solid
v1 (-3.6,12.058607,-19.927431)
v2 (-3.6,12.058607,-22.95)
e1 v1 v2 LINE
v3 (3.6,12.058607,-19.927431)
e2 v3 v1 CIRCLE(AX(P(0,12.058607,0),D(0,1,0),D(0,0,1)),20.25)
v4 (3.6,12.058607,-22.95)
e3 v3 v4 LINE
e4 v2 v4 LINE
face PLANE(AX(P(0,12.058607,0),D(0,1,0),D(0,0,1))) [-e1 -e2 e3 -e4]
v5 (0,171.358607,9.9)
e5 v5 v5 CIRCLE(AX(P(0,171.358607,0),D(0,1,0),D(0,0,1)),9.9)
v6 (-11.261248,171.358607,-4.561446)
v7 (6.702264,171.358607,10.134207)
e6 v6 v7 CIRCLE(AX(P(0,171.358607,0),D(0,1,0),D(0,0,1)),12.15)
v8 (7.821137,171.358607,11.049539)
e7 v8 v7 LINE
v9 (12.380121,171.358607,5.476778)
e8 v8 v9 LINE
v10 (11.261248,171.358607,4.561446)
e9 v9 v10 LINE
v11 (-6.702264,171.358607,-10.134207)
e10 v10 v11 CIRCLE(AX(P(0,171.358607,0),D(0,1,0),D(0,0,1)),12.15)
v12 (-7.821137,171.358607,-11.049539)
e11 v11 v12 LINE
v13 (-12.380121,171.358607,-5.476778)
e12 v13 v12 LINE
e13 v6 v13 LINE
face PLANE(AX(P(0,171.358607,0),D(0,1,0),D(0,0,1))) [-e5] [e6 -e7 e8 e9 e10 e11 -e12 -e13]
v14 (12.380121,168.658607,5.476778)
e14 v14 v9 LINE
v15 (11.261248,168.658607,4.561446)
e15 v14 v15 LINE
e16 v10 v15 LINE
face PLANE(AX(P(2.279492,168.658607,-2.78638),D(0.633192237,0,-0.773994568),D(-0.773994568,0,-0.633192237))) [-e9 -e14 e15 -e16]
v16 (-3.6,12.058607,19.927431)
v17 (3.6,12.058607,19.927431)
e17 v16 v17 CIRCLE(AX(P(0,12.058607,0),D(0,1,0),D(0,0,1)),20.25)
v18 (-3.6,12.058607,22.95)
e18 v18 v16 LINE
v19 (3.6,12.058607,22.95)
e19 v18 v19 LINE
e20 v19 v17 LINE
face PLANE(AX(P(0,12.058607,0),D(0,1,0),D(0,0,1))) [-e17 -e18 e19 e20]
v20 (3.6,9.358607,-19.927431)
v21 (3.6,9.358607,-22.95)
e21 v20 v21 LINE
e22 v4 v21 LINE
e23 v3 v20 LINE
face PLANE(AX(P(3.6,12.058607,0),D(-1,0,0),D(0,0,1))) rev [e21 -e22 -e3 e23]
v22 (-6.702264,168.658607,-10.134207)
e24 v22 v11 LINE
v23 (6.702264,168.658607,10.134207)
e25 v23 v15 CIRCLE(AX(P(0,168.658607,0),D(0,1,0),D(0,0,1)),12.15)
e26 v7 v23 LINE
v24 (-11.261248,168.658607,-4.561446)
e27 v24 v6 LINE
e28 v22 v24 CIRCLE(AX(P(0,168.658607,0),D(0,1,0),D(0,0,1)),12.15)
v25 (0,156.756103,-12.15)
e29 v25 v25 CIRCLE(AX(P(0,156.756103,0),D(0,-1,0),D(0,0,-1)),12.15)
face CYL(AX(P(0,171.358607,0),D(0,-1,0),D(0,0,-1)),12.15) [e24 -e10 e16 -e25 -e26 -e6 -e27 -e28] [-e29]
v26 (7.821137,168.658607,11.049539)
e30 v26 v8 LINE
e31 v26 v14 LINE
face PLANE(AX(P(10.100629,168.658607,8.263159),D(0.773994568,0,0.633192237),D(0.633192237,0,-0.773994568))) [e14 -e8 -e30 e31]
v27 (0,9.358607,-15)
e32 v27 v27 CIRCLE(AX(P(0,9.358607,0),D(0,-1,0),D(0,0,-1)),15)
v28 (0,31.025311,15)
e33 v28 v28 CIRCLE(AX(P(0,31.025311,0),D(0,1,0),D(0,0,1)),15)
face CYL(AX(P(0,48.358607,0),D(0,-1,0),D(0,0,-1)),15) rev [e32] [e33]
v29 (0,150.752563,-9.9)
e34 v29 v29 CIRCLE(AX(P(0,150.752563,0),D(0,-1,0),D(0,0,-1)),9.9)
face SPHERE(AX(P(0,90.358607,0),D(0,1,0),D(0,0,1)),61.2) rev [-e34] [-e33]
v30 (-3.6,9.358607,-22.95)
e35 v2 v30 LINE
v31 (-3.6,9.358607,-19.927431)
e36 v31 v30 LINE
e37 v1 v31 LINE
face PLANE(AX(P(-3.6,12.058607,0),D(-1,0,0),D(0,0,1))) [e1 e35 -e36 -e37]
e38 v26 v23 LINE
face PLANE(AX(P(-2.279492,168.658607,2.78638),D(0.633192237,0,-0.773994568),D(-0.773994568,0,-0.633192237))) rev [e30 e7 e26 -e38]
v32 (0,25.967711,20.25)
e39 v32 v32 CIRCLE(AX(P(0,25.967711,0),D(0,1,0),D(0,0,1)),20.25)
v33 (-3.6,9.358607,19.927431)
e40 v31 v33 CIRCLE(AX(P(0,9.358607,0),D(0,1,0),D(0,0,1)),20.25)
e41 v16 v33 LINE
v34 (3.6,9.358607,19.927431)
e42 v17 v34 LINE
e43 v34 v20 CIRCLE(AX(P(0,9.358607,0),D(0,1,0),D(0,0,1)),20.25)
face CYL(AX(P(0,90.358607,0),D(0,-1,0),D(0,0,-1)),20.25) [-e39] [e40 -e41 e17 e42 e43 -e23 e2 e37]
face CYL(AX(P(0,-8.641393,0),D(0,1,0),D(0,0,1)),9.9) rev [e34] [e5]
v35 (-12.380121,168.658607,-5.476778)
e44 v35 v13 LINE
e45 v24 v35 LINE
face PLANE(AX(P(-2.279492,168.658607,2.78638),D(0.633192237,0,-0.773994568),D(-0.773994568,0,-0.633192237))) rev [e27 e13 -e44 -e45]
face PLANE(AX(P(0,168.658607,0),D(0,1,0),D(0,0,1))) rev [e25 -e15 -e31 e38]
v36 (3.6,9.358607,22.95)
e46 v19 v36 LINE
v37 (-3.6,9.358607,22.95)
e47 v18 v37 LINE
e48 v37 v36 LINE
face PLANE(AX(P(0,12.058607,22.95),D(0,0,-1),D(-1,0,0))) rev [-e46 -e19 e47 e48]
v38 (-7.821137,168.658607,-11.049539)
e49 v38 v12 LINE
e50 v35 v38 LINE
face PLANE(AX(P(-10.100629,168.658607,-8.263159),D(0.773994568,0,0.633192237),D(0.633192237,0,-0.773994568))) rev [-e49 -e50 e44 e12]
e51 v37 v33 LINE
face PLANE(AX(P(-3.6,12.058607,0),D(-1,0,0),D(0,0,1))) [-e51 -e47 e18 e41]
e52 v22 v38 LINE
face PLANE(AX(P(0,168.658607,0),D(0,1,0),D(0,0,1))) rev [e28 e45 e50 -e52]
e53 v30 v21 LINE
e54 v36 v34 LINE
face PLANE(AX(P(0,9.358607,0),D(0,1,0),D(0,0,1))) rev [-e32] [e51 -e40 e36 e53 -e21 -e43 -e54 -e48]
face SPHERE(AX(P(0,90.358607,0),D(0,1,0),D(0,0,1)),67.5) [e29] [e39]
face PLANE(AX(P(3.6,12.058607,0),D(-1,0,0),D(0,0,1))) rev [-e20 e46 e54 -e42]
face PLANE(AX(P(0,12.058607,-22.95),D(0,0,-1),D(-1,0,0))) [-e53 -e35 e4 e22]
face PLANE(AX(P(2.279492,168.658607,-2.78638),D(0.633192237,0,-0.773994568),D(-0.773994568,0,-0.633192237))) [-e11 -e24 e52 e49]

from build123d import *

# Parameters (mm, degrees)
BOSS_EXTRUDE1_DEPTH = 90
BOSS_EXTRUDE2_DEPTH = 3
SKETCH3_R           = 13.5
BOSS_EXTRUDE3_DEPTH = 90
BOSS_EXTRUDE4_START = -3
BOSS_EXTRUDE4_DEPTH = 3
SKETCH5_R           = 11
CUT_EXTRUDE1_DEPTH  = 200
SCALE1_SCALE        = 1.5
SKETCH6_R           = 25
CUT_EXTRUDE2_DEPTH  = 65
SCALE2_SCALE        = 0.6


# Read off the part's stored shape, not the designer's step: Shell4
with BuildPart() as part:
    # Sketch1 → Boss-Extrude1 (new body)
    with BuildSketch(Plane(origin=(0, 0, 0), x_dir=(1, 0, 0), z_dir=(0, 1, 0))):
        with BuildLine():
            ThreePointArc((-4, 22.141589825), (-22.5, 0), (-4, -22.141589825))
            Line((-4, -22.141589825), (-4, 22.141589825))
        make_face()
        with BuildLine():
            Line((-4, 22.141589825), (-4, -22.141589825))
            ThreePointArc((-4, -22.141589825), (0, -22.5), (4, -22.141589825))
            Line((4, -22.141589825), (4, 22.141589825))
            ThreePointArc((4, 22.141589825), (0, 22.5), (-4, 22.141589825))
        make_face()
        with BuildLine():
            Line((4, 22.141589825), (4, -22.141589825))
            ThreePointArc((4, -22.141589825), (17.26629665, -14.426538046), (22.5, 0))
            ThreePointArc((22.5, 0), (17.26629665, 14.426538046), (4, 22.141589825))
        make_face()
    extrude(amount=BOSS_EXTRUDE1_DEPTH)

    # Sketch1<3> → Boss-Extrude2 (add)
    with BuildSketch(Plane(origin=(0, 0, 0), x_dir=(1, 0, 0), z_dir=(0, 1, 0))):
        with BuildLine():
            Line((-4, 25.5), (-4, 22.141589825))
            ThreePointArc((-4, 22.141589825), (0, 22.5), (4, 22.141589825))
            Line((4, 22.141589825), (4, 25.5))
            Line((4, 25.5), (-4, 25.5))
        make_face()
        with BuildLine():
            Line((-4, -22.141589825), (-4, -25.5))
            Line((-4, -25.5), (4, -25.5))
            Line((4, -25.5), (4, -22.141589825))
            ThreePointArc((4, -22.141589825), (0, -22.5), (-4, -22.141589825))
        make_face()
    extrude(amount=BOSS_EXTRUDE2_DEPTH)

    # Sketch3 → Boss-Extrude3 (add)
    with BuildSketch(Plane(origin=(0, 90, 0), x_dir=(1, 0, 0), z_dir=(0, 1, 0))):
        with Locations(Location((0, 0, 0), (0, 0, 90))):
            Circle(SKETCH3_R)
    extrude(amount=BOSS_EXTRUDE3_DEPTH)

    # Sketch4 → Boss-Extrude4 (add)
    with BuildSketch(Plane(origin=(0, 180, 0), x_dir=(1, 0, 0), z_dir=(0, 1, 0)).offset(BOSS_EXTRUDE4_START)):
        with BuildLine():
            Line((-8.690152284, 12.277265708), (-13.755690181, 6.085309166))
            Line((-13.755690181, 6.085309166), (-12.345874566, 5.461628073))
            ThreePointArc((-12.345874566, 5.461628073), (-10.448926665, 8.5480952), (-7.799501781, 11.018973272))
            Line((-7.799501781, 11.018973272), (-8.690152284, 12.277265708))
        make_face()
        with BuildLine():
            ThreePointArc((-7.799501781, 11.018973272), (-7.62418516, 11.140996394), (-7.446959855, 11.260230411))
            Line((-7.446959855, 11.260230411), (-8.690152284, 12.277265708))
            Line((-8.690152284, 12.277265708), (-7.799501781, 11.018973272))
        make_face()
        with BuildLine():
            ThreePointArc((12.345874566, -5.461628073), (12.430742152, -5.265610084), (12.512497752, -5.068273869))
            Line((12.512497752, -5.068273869), (-7.446959855, 11.260230411))
            ThreePointArc((-7.446959855, 11.260230411), (-7.62418516, 11.140996394), (-7.799501781, 11.018973272))
            Line((-7.799501781, 11.018973272), (0, 0))
            Line((0, 0), (12.345874566, -5.461628073))
        make_face()
        with BuildLine():
            Line((0, 0), (7.799501781, -11.018973272))
            ThreePointArc((7.799501781, -11.018973272), (10.448926665, -8.5480952), (12.345874566, -5.461628073))
            Line((12.345874566, -5.461628073), (0, 0))
        make_face()
        with BuildLine():
            Line((-12.345874566, 5.461628073), (0, 0))
            Line((0, 0), (-7.799501781, 11.018973272))
            ThreePointArc((-7.799501781, 11.018973272), (-10.448926665, 8.5480952), (-12.345874566, 5.461628073))
        make_face()
        with BuildLine():
            Line((-12.512497752, 5.068273869), (7.446959855, -11.260230411))
            ThreePointArc((7.446959855, -11.260230411), (7.62418516, -11.140996394), (7.799501781, -11.018973272))
            Line((7.799501781, -11.018973272), (0, 0))
            Line((0, 0), (-12.345874566, 5.461628073))
            ThreePointArc((-12.345874566, 5.461628073), (-12.430742152, 5.265610084), (-12.512497752, 5.068273869))
        make_face()
        with BuildLine():
            Line((-13.755690181, 6.085309166), (-12.512497752, 5.068273869))
            ThreePointArc((-12.512497752, 5.068273869), (-12.430742152, 5.265610084), (-12.345874566, 5.461628073))
            Line((-12.345874566, 5.461628073), (-13.755690181, 6.085309166))
        make_face()
        with BuildLine():
            Line((12.345874566, -5.461628073), (13.755690181, -6.085309166))
            Line((13.755690181, -6.085309166), (12.512497752, -5.068273869))
            ThreePointArc((12.512497752, -5.068273869), (12.430742152, -5.265610084), (12.345874566, -5.461628073))
        make_face()
        with BuildLine():
            Line((7.799501781, -11.018973272), (8.690152284, -12.277265708))
            Line((8.690152284, -12.277265708), (13.755690181, -6.085309166))
            Line((13.755690181, -6.085309166), (12.345874566, -5.461628073))
            ThreePointArc((12.345874566, -5.461628073), (10.448926665, -8.5480952), (7.799501781, -11.018973272))
        make_face()
        with BuildLine():
            Line((7.446959855, -11.260230411), (8.690152284, -12.277265708))
            Line((8.690152284, -12.277265708), (7.799501781, -11.018973272))
            ThreePointArc((7.799501781, -11.018973272), (7.62418516, -11.140996394), (7.446959855, -11.260230411))
        make_face()
    extrude(amount=BOSS_EXTRUDE4_DEPTH)

    # Sketch2 one side → Revolve1 (revolve)
    with BuildSketch(Plane(origin=(0, 90, 0), x_dir=(1, 0, 0), z_dir=(0, 1, 0))):
        with BuildLine():
            Line((-22.5, 0), (22.5, 0))
            ThreePointArc((22.5, 0), (0, 22.5), (-22.5, 0))
        make_face()
        with BuildLine():
            Line((-75, 0), (75, 0))
            ThreePointArc((75, 0), (0, 75), (-75, 0))
        make_face()
        with BuildLine():
            ThreePointArc((-22.5, 0), (0, -22.5), (22.5, 0))
            Line((22.5, 0), (-22.5, 0))
        make_face()
    revolve(axis=Axis((-75, 90, 0), (1, 0, 0)))

    # Shell4 outline → Shell4 (revolve, cut)
    with BuildSketch(Plane.XY):
        with BuildLine():
            Line((6.499999977, 157.688625339), (6.5, 173))
            Line((6.5, 173), (0, 173))
            Line((0, 173), (0, 7))
            Line((0, 7), (15.5, 7))
            Line((15.5, 7), (15.499999978, 23.790106474))
            ThreePointArc((15.499999978, 23.790106474), (67.846911043, 94.560335727), (6.499999977, 157.688625339))
        make_face()
    revolve(axis=Axis((0, 0, 0), (0, 1, 0)), mode=Mode.SUBTRACT)

    # Sketch5 → Cut-Extrude1 (cut)
    with BuildSketch(Plane(origin=(0, 180, 0), x_dir=(1, 0, 0), z_dir=(0, 1, 0))):
        with Locations(Location((0, 0, 0), (0, 0, 270))):
            Circle(SKETCH5_R)
    extrude(amount=-CUT_EXTRUDE1_DEPTH, mode=Mode.SUBTRACT)


with BuildPart() as part_1:
    # Scale1: scaled about (-7.769e-06, 87.871063755, -1.7236e-05)
    add(part.part.scale(SCALE1_SCALE).moved(Location((3.884e-06, -43.935531877, 8.618e-06))))

    # Sketch6 → Cut-Extrude2 (cut)
    with BuildSketch(Plane.XZ.offset(43.93576905)):
        with Locations(Location((0, 0, 0), (0, 0, 270))):
            Circle(SKETCH6_R)
    extrude(amount=-CUT_EXTRUDE2_DEPTH, mode=Mode.SUBTRACT)


with BuildPart() as part_2:
    # Scale2: scaled about (-8.009e-06, 89.299768171, -1.5386e-05)
    add(part_1.part.scale(SCALE2_SCALE).moved(Location((-3.204e-06, 35.719907268, -6.154e-06))))


solid = part_2.part
